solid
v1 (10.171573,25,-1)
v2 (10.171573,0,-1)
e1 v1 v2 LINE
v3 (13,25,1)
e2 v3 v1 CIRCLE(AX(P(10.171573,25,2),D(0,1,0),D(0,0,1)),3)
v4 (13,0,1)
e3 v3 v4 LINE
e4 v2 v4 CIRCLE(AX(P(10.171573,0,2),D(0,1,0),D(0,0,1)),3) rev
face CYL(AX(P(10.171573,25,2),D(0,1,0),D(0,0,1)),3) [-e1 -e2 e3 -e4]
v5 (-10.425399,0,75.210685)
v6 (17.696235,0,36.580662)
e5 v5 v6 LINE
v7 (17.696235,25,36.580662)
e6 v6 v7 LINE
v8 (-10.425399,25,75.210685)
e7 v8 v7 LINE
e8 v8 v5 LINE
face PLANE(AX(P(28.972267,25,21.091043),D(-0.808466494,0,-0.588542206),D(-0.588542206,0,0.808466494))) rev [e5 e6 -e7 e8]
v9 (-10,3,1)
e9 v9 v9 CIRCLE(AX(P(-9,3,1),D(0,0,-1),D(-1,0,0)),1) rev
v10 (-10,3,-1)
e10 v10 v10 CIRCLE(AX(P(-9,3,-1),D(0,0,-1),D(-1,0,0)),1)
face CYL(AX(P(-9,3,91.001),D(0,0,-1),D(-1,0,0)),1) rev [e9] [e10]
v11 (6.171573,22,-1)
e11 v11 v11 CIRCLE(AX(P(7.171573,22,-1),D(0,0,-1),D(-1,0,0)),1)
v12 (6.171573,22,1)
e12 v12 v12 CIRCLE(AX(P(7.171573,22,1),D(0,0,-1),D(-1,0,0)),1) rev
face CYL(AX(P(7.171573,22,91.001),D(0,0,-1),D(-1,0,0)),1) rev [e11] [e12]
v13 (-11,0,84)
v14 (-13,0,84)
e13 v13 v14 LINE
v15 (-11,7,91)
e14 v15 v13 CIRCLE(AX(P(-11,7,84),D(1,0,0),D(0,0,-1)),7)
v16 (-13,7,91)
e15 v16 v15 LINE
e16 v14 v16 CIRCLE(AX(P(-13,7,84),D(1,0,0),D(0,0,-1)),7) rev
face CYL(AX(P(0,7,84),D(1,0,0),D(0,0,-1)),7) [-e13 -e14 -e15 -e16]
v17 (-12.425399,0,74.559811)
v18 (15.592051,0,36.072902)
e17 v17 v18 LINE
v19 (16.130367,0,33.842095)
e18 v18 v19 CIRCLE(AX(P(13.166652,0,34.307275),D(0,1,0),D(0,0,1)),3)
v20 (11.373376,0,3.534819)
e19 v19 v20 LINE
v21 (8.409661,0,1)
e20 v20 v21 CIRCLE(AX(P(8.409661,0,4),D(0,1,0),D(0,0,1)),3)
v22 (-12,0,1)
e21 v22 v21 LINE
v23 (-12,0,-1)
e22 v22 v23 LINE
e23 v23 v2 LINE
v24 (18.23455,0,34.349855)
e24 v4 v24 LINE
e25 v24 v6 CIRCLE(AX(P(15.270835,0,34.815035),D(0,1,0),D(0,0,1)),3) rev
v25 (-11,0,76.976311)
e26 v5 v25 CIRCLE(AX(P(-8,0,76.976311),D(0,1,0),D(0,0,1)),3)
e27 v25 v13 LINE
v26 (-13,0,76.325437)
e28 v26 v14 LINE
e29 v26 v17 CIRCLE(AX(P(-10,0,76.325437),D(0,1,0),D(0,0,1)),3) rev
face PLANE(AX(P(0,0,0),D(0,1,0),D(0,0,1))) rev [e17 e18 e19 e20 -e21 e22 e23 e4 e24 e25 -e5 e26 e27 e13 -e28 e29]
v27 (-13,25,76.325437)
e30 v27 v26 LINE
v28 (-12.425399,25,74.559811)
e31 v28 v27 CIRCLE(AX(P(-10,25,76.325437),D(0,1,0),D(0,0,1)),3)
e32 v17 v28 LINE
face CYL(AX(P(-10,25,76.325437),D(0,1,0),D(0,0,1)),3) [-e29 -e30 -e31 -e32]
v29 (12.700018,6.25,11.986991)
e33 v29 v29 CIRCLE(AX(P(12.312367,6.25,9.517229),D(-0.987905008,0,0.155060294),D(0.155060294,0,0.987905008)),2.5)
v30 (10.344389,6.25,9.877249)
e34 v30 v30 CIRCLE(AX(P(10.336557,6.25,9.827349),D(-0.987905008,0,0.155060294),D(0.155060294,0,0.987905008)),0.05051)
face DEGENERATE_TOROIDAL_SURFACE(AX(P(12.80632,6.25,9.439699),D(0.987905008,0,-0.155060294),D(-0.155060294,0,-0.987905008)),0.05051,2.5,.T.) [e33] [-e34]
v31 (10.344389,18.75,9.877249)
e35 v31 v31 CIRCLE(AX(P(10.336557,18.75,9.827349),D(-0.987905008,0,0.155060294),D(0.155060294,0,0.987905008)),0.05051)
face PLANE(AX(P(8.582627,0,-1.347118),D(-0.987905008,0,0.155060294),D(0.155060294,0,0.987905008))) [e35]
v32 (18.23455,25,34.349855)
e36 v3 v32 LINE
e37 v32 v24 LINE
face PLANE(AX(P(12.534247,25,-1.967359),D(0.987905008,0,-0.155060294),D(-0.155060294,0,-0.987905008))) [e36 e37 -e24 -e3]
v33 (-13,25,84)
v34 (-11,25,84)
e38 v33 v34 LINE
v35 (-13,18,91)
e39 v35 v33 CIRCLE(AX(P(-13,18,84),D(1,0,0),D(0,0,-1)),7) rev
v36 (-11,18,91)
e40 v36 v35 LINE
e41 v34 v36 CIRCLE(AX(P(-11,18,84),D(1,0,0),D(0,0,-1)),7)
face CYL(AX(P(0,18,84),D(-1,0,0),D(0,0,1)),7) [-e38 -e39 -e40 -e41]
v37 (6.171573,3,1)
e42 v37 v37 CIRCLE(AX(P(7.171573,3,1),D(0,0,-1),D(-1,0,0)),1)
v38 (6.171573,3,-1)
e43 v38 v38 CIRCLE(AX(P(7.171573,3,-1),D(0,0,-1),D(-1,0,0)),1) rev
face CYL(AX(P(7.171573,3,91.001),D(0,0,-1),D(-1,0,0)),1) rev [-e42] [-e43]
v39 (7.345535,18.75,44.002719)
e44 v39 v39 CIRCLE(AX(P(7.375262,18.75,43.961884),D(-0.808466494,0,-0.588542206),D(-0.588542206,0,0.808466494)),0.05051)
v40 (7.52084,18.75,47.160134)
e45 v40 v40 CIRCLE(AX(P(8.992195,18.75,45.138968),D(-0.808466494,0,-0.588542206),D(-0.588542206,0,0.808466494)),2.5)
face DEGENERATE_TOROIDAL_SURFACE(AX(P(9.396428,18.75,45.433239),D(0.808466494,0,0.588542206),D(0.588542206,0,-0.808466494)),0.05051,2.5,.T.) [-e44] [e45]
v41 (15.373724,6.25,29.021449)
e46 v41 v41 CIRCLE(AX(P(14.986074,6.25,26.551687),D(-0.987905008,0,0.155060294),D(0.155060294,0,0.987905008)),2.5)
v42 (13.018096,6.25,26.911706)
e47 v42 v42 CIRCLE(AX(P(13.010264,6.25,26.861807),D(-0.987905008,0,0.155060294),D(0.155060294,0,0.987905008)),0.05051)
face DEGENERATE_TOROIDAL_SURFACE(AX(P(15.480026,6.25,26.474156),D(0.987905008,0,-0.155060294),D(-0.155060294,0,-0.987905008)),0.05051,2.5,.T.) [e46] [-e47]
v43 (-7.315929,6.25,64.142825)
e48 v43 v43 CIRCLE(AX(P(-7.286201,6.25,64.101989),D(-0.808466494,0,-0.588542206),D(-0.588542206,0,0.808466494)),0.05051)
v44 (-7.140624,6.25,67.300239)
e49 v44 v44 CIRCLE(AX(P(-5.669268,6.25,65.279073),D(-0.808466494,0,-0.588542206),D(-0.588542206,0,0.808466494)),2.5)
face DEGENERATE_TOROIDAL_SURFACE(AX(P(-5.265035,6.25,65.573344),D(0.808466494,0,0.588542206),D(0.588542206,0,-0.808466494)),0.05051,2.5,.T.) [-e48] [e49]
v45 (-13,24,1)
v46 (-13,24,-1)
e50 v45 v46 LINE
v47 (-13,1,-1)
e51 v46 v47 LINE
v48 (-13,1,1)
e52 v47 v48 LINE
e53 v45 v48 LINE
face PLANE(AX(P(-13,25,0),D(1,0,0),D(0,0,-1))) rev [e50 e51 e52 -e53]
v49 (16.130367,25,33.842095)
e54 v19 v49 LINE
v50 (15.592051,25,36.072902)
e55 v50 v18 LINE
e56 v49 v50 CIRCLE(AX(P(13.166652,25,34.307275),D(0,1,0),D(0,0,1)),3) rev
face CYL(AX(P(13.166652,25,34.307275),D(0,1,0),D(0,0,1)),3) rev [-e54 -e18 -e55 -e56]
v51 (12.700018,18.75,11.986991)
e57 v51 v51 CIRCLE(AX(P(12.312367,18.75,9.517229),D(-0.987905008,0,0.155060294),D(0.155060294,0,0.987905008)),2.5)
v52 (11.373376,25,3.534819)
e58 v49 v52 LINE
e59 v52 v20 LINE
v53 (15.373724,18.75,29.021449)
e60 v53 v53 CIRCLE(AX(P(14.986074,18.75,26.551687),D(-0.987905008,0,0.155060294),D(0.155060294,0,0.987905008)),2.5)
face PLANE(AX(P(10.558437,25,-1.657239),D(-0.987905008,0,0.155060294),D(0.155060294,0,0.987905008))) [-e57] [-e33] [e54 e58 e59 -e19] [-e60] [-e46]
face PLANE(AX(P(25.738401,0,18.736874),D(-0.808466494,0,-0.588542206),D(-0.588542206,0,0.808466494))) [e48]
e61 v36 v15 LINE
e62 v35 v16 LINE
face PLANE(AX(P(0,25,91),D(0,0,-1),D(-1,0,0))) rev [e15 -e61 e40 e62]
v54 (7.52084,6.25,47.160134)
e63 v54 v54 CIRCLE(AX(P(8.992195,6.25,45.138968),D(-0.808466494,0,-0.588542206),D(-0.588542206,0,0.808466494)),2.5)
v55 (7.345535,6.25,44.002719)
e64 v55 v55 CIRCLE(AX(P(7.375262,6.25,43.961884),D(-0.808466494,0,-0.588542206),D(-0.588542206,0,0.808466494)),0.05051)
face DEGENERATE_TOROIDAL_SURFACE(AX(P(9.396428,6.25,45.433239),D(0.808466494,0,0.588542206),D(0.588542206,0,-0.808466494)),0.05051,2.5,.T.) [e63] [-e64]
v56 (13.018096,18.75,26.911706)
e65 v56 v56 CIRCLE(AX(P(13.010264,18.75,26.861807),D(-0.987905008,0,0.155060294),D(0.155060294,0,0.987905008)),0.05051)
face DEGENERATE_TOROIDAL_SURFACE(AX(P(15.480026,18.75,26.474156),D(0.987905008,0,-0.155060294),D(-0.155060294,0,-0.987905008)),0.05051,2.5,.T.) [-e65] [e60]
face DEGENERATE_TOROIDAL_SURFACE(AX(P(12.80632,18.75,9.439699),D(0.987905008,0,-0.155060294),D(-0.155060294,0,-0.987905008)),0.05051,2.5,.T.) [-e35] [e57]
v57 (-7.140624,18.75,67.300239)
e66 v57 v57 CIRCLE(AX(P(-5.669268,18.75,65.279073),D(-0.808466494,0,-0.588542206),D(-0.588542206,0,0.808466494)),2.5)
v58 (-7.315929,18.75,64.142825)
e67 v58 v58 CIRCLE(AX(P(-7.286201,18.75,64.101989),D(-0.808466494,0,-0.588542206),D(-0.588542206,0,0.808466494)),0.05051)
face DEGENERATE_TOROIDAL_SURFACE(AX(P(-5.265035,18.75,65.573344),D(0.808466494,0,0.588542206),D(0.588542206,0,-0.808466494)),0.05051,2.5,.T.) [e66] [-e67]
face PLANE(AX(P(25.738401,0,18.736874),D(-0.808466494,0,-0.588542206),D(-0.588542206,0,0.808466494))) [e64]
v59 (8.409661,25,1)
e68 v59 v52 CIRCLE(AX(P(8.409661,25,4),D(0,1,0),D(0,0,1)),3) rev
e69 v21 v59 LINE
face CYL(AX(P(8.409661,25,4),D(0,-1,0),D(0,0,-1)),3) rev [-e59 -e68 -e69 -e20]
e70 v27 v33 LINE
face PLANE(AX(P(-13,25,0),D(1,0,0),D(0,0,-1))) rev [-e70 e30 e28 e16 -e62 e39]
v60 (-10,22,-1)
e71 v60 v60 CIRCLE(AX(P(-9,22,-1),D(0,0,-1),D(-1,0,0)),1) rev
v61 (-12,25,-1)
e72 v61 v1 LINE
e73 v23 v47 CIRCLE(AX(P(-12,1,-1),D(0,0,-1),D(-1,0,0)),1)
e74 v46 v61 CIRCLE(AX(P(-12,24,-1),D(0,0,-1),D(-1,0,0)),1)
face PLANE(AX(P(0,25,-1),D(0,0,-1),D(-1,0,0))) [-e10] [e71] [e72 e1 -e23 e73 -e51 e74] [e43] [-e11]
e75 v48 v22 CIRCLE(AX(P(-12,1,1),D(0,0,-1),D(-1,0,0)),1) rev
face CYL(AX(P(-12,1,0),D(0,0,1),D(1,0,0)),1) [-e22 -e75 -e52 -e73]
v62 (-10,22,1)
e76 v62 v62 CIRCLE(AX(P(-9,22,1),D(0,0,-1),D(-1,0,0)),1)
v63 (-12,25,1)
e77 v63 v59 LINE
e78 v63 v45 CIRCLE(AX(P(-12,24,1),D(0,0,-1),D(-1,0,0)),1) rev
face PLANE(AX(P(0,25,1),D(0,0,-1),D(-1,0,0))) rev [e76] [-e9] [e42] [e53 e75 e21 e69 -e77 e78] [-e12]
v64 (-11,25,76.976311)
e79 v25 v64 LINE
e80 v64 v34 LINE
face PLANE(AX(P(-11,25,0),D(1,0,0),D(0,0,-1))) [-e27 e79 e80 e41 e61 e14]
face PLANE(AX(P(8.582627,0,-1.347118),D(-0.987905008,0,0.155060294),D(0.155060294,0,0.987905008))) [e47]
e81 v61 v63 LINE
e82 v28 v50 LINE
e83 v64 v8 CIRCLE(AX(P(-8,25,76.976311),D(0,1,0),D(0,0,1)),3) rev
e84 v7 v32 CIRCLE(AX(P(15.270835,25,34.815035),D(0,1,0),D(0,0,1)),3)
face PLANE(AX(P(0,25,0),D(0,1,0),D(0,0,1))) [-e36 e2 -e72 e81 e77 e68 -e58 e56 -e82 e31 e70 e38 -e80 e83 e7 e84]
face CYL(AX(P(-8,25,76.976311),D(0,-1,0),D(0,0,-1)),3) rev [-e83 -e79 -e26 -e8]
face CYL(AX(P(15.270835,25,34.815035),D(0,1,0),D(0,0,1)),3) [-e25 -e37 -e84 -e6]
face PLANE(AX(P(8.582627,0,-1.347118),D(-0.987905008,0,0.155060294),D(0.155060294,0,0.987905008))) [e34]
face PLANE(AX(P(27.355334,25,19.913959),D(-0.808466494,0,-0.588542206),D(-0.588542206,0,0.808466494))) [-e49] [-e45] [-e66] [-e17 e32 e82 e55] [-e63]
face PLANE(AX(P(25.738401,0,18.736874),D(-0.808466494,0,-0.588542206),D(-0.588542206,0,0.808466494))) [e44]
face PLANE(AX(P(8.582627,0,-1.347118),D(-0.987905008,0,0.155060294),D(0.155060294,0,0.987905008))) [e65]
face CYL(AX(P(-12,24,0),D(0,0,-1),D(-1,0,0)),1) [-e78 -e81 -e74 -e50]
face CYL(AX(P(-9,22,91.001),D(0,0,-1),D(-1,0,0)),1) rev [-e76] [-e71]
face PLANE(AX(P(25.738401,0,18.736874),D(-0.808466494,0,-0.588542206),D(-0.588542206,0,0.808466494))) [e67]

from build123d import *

# Parameters (mm, degrees)
SKETCH1_W           = 2
SKETCH1_H           = 15
SKETCH1_W_2         = 26
SKETCH1_H_2         = 2
BOSS_EXTRUDE1_DEPTH = 25
SKETCH2_R           = 2.5
BOSS_EXTRUDE2_DEPTH = 2
SKETCH3_R           = 2.5
BOSS_EXTRUDE3_DEPTH = 2
FILLET1_R           = 2.5
FILLET2_R           = 7
FILLET3_R           = 1
FILLET4_R           = 3
FILLET5_R           = 3
FILLET6_R           = 3
CUT_EXTRUDE2_REACH  = 99.071
SKETCH8_R           = 1


with BuildPart() as part:
    # Sketch1 → Boss-Extrude1 (new body)
    with BuildSketch(Plane(origin=(0, 0, 0), x_dir=(1, 0, 0), z_dir=(0, 1, 0))):
        Polygon((-12.616932988, -74.822915589), (-13, -75.349125674), (-13, -76), (-11, -76), (18.427110278, -35.576675289), (13, -1), (10.975513857, -1), (11.024189983, -1.310120587), (16.322926791, -35.068915352), align=None)
        with Locations((-12, -83.5)):
            Rectangle(SKETCH1_W, SKETCH1_H)
        Rectangle(SKETCH1_W_2, SKETCH1_H_2)
    extrude(amount=BOSS_EXTRUDE1_DEPTH)

    # Sketch2 → Boss-Extrude2 (add)
    with BuildSketch(Plane(origin=(10.558437112, 0, -1.657238647), x_dir=(0.15506029365043303, 0, 0.9879050082538512), z_dir=(-0.9879050082538512, 0, 0.15506029365043303))):
        with Locations((28.554289051, 18.75)):
            Circle(SKETCH2_R)
        with BuildLine():
            ThreePointArc((11.31127729, 16.25), (13.079044243, 16.982233047), (13.81127729, 18.75))
            Line((13.81127729, 18.75), (11.31127729, 18.75))
            Line((11.31127729, 18.75), (11.31127729, 16.25))
        make_face()
        with BuildLine():
            Line((11.31127729, 18.75), (13.81127729, 18.75))
            ThreePointArc((13.81127729, 18.75), (9.543510337, 20.517766953), (11.31127729, 16.25))
            Line((11.31127729, 16.25), (11.31127729, 18.75))
        make_face()
        with Locations((11.31127729, 6.25)):
            Circle(SKETCH2_R)
        with Locations((28.554289051, 6.25)):
            Circle(SKETCH2_R)
    extrude(amount=BOSS_EXTRUDE2_DEPTH)

    # Sketch3 → Boss-Extrude3 (add)
    with BuildSketch(Plane(origin=(27.355333892, 0, 19.913958906), x_dir=(-0.5885422055553007, 0, 0.8084664942223037), z_dir=(-0.8084664942223037, 0, -0.5885422055553007))):
        with BuildLine():
            ThreePointArc((33.701056824, 18.75), (29.433289871, 20.517766953), (31.201056824, 16.25))
            Line((31.201056824, 16.25), (31.201056824, 18.75))
            Line((31.201056824, 18.75), (33.701056824, 18.75))
        make_face()
        with BuildLine():
            Line((31.201056824, 18.75), (31.201056824, 16.25))
            ThreePointArc((31.201056824, 16.25), (32.968823777, 16.982233047), (33.701056824, 18.75))
            Line((33.701056824, 18.75), (31.201056824, 18.75))
        make_face()
        with Locations((31.201056824, 6.25)):
            Circle(SKETCH3_R)
        with Locations((56.11254704, 6.25)):
            Circle(SKETCH3_R)
        with Locations((56.11254704, 18.75)):
            Circle(SKETCH3_R)
    extrude(amount=BOSS_EXTRUDE3_DEPTH)

    # Fillet1
    # the kernel refuses this fillet: 2.5 mm, written as the material it takes off along each edge
    with BuildSketch(Plane(origin=(13.010263541, 18.75, 26.861807101), x_dir=(0.1550602936504321, 0, 0.9879050082538512), z_dir=(0, -1, 0))) as fillet1_piece_1:
        with BuildLine():
            CenterArc((0.050510257, -2.5), FILLET1_R, 11.536959033, 78.463040967)
            Line((0.050510257, 0), (0.050510257, 0.05))
            Line((0.050510257, 0.05), (2.5, 0.05))
            Line((2.5, 0.05), (2.55, 0))
            ThreePointArc((2.55, 0), (2.55, -1), (2.548989795, -1.99))
            Line((2.548989795, -1.99), (2.5, -2))
        make_face()
    revolve(axis=Axis((13.010263541, 18.75, 26.861807101), (-0.9879050082538512, 0, 0.15506029365043303)), mode=Mode.SUBTRACT)
    with BuildSketch(Plane(origin=(10.336557074, 18.75, 9.827349425), x_dir=(0, -1, 0), z_dir=(0.1550602936504327, 1.65855285874559e-14, 0.9879050082538511))) as fillet1_piece_2:
        with BuildLine():
            CenterArc((0.050510257, 2.5), FILLET1_R, 270, 78.463040967)
            Line((0.050510257, 0), (0.050510257, -0.05))
            Line((0.050510257, -0.05), (2.5, -0.05))
            Line((2.5, -0.05), (2.55, 0))
            ThreePointArc((2.55, 0), (2.55, 1), (2.548989795, 1.99))
            Line((2.548989795, 1.99), (2.5, 2))
        make_face()
    revolve(axis=Axis((10.336557074, 18.75, 9.827349425), (0.9879050082538511, 0, -0.1550602936504327)), mode=Mode.SUBTRACT)
    with BuildSketch(Plane(origin=(10.336557074, 6.25, 9.827349425), x_dir=(0.1550602936504327, 0, 0.9879050082538511), z_dir=(0, -1, 0))) as fillet1_piece_3:
        with BuildLine():
            CenterArc((0.050510257, -2.5), FILLET1_R, 11.536959033, 78.463040967)
            Line((0.050510257, 0), (0.050510257, 0.05))
            Line((0.050510257, 0.05), (2.5, 0.05))
            Line((2.5, 0.05), (2.55, 0))
            ThreePointArc((2.55, 0), (2.55, -1), (2.548989795, -1.99))
            Line((2.548989795, -1.99), (2.5, -2))
        make_face()
    revolve(axis=Axis((10.336557074, 6.25, 9.827349425), (-0.9879050082538512, 0, 0.15506029365043303)), mode=Mode.SUBTRACT)
    with BuildSketch(Plane(origin=(13.010263541, 6.25, 26.861807101), x_dir=(0.1550602936504321, 0, 0.9879050082538512), z_dir=(0, -1, 0))) as fillet1_piece_4:
        with BuildLine():
            CenterArc((0.050510257, -2.5), FILLET1_R, 11.536959033, 78.463040967)
            Line((0.050510257, 0), (0.050510257, 0.05))
            Line((0.050510257, 0.05), (2.5, 0.05))
            Line((2.5, 0.05), (2.55, 0))
            ThreePointArc((2.55, 0), (2.55, -1), (2.548989795, -1.99))
            Line((2.548989795, -1.99), (2.5, -2))
        make_face()
    revolve(axis=Axis((13.010263541, 6.25, 26.861807101), (-0.9879050082538512, 0, 0.15506029365043303)), mode=Mode.SUBTRACT)
    with BuildSketch(Plane(origin=(7.375262105, 18.75, 43.961883521), x_dir=(0, -1, 0), z_dir=(-0.5885422055553015, 1.776176572418508e-14, 0.8084664942223031))) as fillet1_piece_5:
        with BuildLine():
            CenterArc((0.050510257, 2.5), FILLET1_R, 270, 78.463040967)
            Line((0.050510257, 0), (0.050510257, -0.05))
            Line((0.050510257, -0.05), (2.5, -0.05))
            Line((2.5, -0.05), (2.55, 0))
            ThreePointArc((2.55, 0), (2.55, 1), (2.548989795, 1.99))
            Line((2.548989795, 1.99), (2.5, 2))
        make_face()
    revolve(axis=Axis((7.375262105, 18.75, 43.961883521), (0.8084664942223031, 0, 0.5885422055553015)), mode=Mode.SUBTRACT)
    with BuildSketch(Plane(origin=(7.375262105, 6.25, 43.961883521), x_dir=(-0.5885422055553018, 0, 0.8084664942223029), z_dir=(0, -1, 0))) as fillet1_piece_6:
        with BuildLine():
            CenterArc((0.050510257, -2.5), FILLET1_R, 11.536959033, 78.463040967)
            Line((0.050510257, 0), (0.050510257, 0.05))
            Line((0.050510257, 0.05), (2.5, 0.05))
            Line((2.5, 0.05), (2.55, 0))
            ThreePointArc((2.55, 0), (2.55, -1), (2.548989795, -1.99))
            Line((2.548989795, -1.99), (2.5, -2))
        make_face()
    revolve(axis=Axis((7.375262105, 6.25, 43.961883521), (-0.8084664942223037, 0, -0.5885422055553007)), mode=Mode.SUBTRACT)
    with BuildSketch(Plane(origin=(-7.286201291, 6.25, 64.101988682), x_dir=(-0.5885422055552982, 0, 0.8084664942223055), z_dir=(0, -1, 0))) as fillet1_piece_7:
        with BuildLine():
            CenterArc((0.050510257, -2.5), FILLET1_R, 11.536959033, 78.463040967)
            Line((0.050510257, 0), (0.050510257, 0.05))
            Line((0.050510257, 0.05), (2.5, 0.05))
            Line((2.5, 0.05), (2.55, 0))
            ThreePointArc((2.55, 0), (2.55, -1), (2.548989795, -1.99))
            Line((2.548989795, -1.99), (2.5, -2))
        make_face()
    revolve(axis=Axis((-7.286201291, 6.25, 64.101988682), (-0.8084664942223037, 0, -0.5885422055553007)), mode=Mode.SUBTRACT)
    with BuildSketch(Plane(origin=(-7.286201291, 18.75, 64.101988682), x_dir=(-0.5885422055552982, 0, 0.8084664942223055), z_dir=(0, -1, 0))) as fillet1_piece_8:
        with BuildLine():
            CenterArc((0.050510257, -2.5), FILLET1_R, 11.536959033, 78.463040967)
            Line((0.050510257, 0), (0.050510257, 0.05))
            Line((0.050510257, 0.05), (2.5, 0.05))
            Line((2.5, 0.05), (2.55, 0))
            ThreePointArc((2.55, 0), (2.55, -1), (2.548989795, -1.99))
            Line((2.548989795, -1.99), (2.5, -2))
        make_face()
    revolve(axis=Axis((-7.286201291, 18.75, 64.101988682), (-0.8084664942223037, 0, -0.5885422055553007)), mode=Mode.SUBTRACT)

    # Fillet2
    fillet2_edges = [part.edges().sort_by_distance(p)[0] for p in [
        (-12, 25, 91),
        (-12, 0, 91),
    ]]
    fillet(fillet2_edges, radius=FILLET2_R)

    # Fillet3
    fillet3_edges = [part.edges().sort_by_distance(p)[0] for p in [
        (-13, 0, 0),
        (-13, 25, 0),
    ]]
    fillet(fillet3_edges, radius=FILLET3_R)

    # Fillet4
    # the kernel refuses this fillet: 3 mm, written as the material it adds along each edge
    with BuildSketch(Plane(origin=(10.975513857, 0, 1), x_dir=(-1, 0, 0), z_dir=(0, 1, 0))) as fillet4_piece_1:
        with BuildLine():
            CenterArc((FILLET4_R * 0.855284363669, FILLET4_R), FILLET4_R, 188.920293103, 81.079706897)
            Line((-FILLET4_R * 0.132620644585, FILLET4_R * 0.84493970635), (0, 0))
            Line((0, 0), (FILLET4_R * 0.855284363669, 0))
        make_face()
    extrude(amount=25)
    # the kernel refuses this fillet: 3 mm, written as the material it takes off along each edge
    with BuildSketch(Plane(origin=(13, -7.071067812, -1), x_dir=(-1, 0, 0), z_dir=(0, 1, 0))) as fillet4_2_piece_1:
        with BuildLine():
            CenterArc((2.828427125, 3), FILLET4_R, 199.471220634, 70.528779366)
            Line((0, 2), (0, 0))
            Line((0, 0), (2.828427125, 0))
        make_face()
    extrude(amount=39.142135624, mode=Mode.SUBTRACT)

    # Fillet5
    fillet5_edges = [part.edges().sort_by_distance(p)[0] for p in [
        (16.322926791, 12.5, 35.068915352),
        (18.427110278, 12.5, 35.576675289),
    ]]
    fillet(fillet5_edges, radius=FILLET5_R)

    # Fillet6
    fillet6_edges = [part.edges().sort_by_distance(p)[0] for p in [
        (-11, 12.5, 76),
        (-13, 12.5, 75.349125674),
    ]]
    fillet(fillet6_edges, radius=FILLET6_R)

    # Sketch8 → Cut-Extrude2 (cut, up to next)
    with BuildSketch(Plane(origin=(0, 0, -1), x_dir=(-1, 0, 0), z_dir=(0, 0, -1)), mode=Mode.PRIVATE) as cut_extrude2_sk1:
        with Locations((-7.171572875, 3)):
            Circle(SKETCH8_R)
    cut_extrude2_tool1 = extrude(cut_extrude2_sk1.sketch, amount=-CUT_EXTRUDE2_REACH, mode=Mode.PRIVATE) & part.part
    # Sketch8 → Cut-Extrude2 (cut, up to next)
    with BuildSketch(Plane(origin=(0, 0, -1), x_dir=(-1, 0, 0), z_dir=(0, 0, -1)), mode=Mode.PRIVATE) as cut_extrude2_sk2:
        with BuildLine():
            ThreePointArc((-7.171572875, 23), (-7.878679656, 22.707106781), (-8.171572875, 22))
            Line((-8.171572875, 22), (-7.171572875, 22))
            Line((-7.171572875, 22), (-7.171572875, 23))
        make_face()
    cut_extrude2_tool2 = extrude(cut_extrude2_sk2.sketch, amount=-CUT_EXTRUDE2_REACH, mode=Mode.PRIVATE) & part.part
    # Sketch8 → Cut-Extrude2 (cut, up to next)
    with BuildSketch(Plane(origin=(0, 0, -1), x_dir=(-1, 0, 0), z_dir=(0, 0, -1)), mode=Mode.PRIVATE) as cut_extrude2_sk3:
        with BuildLine():
            Line((-7.171572875, 22), (-8.171572875, 22))
            ThreePointArc((-8.171572875, 22), (-7.171572875, 21), (-6.171572875, 22))
            ThreePointArc((-6.171572875, 22), (-6.464466094, 22.707106781), (-7.171572875, 23))
            Line((-7.171572875, 23), (-7.171572875, 22))
        make_face()
    cut_extrude2_tool3 = extrude(cut_extrude2_sk3.sketch, amount=-CUT_EXTRUDE2_REACH, mode=Mode.PRIVATE) & part.part
    # Sketch8 → Cut-Extrude2 (cut, up to next)
    with BuildSketch(Plane(origin=(0, 0, -1), x_dir=(-1, 0, 0), z_dir=(0, 0, -1)), mode=Mode.PRIVATE) as cut_extrude2_sk4:
        with BuildLine():
            ThreePointArc((-7.171572875, 23), (-7.878679656, 22.707106781), (-8.171572875, 22))
            Line((-8.171572875, 22), (-7.171572875, 22))
            Line((-7.171572875, 22), (-7.171572875, 23))
        make_face()
    cut_extrude2_tool4 = extrude(cut_extrude2_sk4.sketch, amount=-CUT_EXTRUDE2_REACH, mode=Mode.PRIVATE) & part.part
    # Sketch8 → Cut-Extrude2 (cut, up to next)
    with BuildSketch(Plane(origin=(0, 0, -1), x_dir=(-1, 0, 0), z_dir=(0, 0, -1)), mode=Mode.PRIVATE) as cut_extrude2_sk5:
        with BuildLine():
            Line((-7.171572875, 22), (-8.171572875, 22))
            ThreePointArc((-8.171572875, 22), (-7.171572875, 21), (-6.171572875, 22))
            ThreePointArc((-6.171572875, 22), (-6.464466094, 22.707106781), (-7.171572875, 23))
            Line((-7.171572875, 23), (-7.171572875, 22))
        make_face()
    cut_extrude2_tool5 = extrude(cut_extrude2_sk5.sketch, amount=-CUT_EXTRUDE2_REACH, mode=Mode.PRIVATE) & part.part
    # Sketch8 → Cut-Extrude2 (cut, up to next)
    with BuildSketch(Plane(origin=(0, 0, -1), x_dir=(-1, 0, 0), z_dir=(0, 0, -1)), mode=Mode.PRIVATE) as cut_extrude2_sk6:
        with Locations((9, 22)):
            Circle(SKETCH8_R)
    cut_extrude2_tool6 = extrude(cut_extrude2_sk6.sketch, amount=-CUT_EXTRUDE2_REACH, mode=Mode.PRIVATE) & part.part
    # Sketch8 → Cut-Extrude2 (cut, up to next)
    with BuildSketch(Plane(origin=(0, 0, -1), x_dir=(-1, 0, 0), z_dir=(0, 0, -1)), mode=Mode.PRIVATE) as cut_extrude2_sk7:
        with Locations((9, 3)):
            Circle(SKETCH8_R)
    cut_extrude2_tool7 = extrude(cut_extrude2_sk7.sketch, amount=-CUT_EXTRUDE2_REACH, mode=Mode.PRIVATE) & part.part
    add(cut_extrude2_tool1.solids().sort_by_distance((7.171573, 3, -1))[0], mode=Mode.SUBTRACT)
    add(cut_extrude2_tool2.solids().sort_by_distance((7.595986, 22.424413, -1))[0], mode=Mode.SUBTRACT)
    add(cut_extrude2_tool3.solids().sort_by_distance((7.030102, 21.858529, -1))[0], mode=Mode.SUBTRACT)
    add(cut_extrude2_tool4.solids().sort_by_distance((7.595986, 22.424413, -1))[0], mode=Mode.SUBTRACT)
    add(cut_extrude2_tool5.solids().sort_by_distance((7.030102, 21.858529, -1))[0], mode=Mode.SUBTRACT)
    add(cut_extrude2_tool6.solids().sort_by_distance((-9, 22, -1))[0], mode=Mode.SUBTRACT)
    add(cut_extrude2_tool7.solids().sort_by_distance((-9, 3, -1))[0], mode=Mode.SUBTRACT)


solid = part.part
